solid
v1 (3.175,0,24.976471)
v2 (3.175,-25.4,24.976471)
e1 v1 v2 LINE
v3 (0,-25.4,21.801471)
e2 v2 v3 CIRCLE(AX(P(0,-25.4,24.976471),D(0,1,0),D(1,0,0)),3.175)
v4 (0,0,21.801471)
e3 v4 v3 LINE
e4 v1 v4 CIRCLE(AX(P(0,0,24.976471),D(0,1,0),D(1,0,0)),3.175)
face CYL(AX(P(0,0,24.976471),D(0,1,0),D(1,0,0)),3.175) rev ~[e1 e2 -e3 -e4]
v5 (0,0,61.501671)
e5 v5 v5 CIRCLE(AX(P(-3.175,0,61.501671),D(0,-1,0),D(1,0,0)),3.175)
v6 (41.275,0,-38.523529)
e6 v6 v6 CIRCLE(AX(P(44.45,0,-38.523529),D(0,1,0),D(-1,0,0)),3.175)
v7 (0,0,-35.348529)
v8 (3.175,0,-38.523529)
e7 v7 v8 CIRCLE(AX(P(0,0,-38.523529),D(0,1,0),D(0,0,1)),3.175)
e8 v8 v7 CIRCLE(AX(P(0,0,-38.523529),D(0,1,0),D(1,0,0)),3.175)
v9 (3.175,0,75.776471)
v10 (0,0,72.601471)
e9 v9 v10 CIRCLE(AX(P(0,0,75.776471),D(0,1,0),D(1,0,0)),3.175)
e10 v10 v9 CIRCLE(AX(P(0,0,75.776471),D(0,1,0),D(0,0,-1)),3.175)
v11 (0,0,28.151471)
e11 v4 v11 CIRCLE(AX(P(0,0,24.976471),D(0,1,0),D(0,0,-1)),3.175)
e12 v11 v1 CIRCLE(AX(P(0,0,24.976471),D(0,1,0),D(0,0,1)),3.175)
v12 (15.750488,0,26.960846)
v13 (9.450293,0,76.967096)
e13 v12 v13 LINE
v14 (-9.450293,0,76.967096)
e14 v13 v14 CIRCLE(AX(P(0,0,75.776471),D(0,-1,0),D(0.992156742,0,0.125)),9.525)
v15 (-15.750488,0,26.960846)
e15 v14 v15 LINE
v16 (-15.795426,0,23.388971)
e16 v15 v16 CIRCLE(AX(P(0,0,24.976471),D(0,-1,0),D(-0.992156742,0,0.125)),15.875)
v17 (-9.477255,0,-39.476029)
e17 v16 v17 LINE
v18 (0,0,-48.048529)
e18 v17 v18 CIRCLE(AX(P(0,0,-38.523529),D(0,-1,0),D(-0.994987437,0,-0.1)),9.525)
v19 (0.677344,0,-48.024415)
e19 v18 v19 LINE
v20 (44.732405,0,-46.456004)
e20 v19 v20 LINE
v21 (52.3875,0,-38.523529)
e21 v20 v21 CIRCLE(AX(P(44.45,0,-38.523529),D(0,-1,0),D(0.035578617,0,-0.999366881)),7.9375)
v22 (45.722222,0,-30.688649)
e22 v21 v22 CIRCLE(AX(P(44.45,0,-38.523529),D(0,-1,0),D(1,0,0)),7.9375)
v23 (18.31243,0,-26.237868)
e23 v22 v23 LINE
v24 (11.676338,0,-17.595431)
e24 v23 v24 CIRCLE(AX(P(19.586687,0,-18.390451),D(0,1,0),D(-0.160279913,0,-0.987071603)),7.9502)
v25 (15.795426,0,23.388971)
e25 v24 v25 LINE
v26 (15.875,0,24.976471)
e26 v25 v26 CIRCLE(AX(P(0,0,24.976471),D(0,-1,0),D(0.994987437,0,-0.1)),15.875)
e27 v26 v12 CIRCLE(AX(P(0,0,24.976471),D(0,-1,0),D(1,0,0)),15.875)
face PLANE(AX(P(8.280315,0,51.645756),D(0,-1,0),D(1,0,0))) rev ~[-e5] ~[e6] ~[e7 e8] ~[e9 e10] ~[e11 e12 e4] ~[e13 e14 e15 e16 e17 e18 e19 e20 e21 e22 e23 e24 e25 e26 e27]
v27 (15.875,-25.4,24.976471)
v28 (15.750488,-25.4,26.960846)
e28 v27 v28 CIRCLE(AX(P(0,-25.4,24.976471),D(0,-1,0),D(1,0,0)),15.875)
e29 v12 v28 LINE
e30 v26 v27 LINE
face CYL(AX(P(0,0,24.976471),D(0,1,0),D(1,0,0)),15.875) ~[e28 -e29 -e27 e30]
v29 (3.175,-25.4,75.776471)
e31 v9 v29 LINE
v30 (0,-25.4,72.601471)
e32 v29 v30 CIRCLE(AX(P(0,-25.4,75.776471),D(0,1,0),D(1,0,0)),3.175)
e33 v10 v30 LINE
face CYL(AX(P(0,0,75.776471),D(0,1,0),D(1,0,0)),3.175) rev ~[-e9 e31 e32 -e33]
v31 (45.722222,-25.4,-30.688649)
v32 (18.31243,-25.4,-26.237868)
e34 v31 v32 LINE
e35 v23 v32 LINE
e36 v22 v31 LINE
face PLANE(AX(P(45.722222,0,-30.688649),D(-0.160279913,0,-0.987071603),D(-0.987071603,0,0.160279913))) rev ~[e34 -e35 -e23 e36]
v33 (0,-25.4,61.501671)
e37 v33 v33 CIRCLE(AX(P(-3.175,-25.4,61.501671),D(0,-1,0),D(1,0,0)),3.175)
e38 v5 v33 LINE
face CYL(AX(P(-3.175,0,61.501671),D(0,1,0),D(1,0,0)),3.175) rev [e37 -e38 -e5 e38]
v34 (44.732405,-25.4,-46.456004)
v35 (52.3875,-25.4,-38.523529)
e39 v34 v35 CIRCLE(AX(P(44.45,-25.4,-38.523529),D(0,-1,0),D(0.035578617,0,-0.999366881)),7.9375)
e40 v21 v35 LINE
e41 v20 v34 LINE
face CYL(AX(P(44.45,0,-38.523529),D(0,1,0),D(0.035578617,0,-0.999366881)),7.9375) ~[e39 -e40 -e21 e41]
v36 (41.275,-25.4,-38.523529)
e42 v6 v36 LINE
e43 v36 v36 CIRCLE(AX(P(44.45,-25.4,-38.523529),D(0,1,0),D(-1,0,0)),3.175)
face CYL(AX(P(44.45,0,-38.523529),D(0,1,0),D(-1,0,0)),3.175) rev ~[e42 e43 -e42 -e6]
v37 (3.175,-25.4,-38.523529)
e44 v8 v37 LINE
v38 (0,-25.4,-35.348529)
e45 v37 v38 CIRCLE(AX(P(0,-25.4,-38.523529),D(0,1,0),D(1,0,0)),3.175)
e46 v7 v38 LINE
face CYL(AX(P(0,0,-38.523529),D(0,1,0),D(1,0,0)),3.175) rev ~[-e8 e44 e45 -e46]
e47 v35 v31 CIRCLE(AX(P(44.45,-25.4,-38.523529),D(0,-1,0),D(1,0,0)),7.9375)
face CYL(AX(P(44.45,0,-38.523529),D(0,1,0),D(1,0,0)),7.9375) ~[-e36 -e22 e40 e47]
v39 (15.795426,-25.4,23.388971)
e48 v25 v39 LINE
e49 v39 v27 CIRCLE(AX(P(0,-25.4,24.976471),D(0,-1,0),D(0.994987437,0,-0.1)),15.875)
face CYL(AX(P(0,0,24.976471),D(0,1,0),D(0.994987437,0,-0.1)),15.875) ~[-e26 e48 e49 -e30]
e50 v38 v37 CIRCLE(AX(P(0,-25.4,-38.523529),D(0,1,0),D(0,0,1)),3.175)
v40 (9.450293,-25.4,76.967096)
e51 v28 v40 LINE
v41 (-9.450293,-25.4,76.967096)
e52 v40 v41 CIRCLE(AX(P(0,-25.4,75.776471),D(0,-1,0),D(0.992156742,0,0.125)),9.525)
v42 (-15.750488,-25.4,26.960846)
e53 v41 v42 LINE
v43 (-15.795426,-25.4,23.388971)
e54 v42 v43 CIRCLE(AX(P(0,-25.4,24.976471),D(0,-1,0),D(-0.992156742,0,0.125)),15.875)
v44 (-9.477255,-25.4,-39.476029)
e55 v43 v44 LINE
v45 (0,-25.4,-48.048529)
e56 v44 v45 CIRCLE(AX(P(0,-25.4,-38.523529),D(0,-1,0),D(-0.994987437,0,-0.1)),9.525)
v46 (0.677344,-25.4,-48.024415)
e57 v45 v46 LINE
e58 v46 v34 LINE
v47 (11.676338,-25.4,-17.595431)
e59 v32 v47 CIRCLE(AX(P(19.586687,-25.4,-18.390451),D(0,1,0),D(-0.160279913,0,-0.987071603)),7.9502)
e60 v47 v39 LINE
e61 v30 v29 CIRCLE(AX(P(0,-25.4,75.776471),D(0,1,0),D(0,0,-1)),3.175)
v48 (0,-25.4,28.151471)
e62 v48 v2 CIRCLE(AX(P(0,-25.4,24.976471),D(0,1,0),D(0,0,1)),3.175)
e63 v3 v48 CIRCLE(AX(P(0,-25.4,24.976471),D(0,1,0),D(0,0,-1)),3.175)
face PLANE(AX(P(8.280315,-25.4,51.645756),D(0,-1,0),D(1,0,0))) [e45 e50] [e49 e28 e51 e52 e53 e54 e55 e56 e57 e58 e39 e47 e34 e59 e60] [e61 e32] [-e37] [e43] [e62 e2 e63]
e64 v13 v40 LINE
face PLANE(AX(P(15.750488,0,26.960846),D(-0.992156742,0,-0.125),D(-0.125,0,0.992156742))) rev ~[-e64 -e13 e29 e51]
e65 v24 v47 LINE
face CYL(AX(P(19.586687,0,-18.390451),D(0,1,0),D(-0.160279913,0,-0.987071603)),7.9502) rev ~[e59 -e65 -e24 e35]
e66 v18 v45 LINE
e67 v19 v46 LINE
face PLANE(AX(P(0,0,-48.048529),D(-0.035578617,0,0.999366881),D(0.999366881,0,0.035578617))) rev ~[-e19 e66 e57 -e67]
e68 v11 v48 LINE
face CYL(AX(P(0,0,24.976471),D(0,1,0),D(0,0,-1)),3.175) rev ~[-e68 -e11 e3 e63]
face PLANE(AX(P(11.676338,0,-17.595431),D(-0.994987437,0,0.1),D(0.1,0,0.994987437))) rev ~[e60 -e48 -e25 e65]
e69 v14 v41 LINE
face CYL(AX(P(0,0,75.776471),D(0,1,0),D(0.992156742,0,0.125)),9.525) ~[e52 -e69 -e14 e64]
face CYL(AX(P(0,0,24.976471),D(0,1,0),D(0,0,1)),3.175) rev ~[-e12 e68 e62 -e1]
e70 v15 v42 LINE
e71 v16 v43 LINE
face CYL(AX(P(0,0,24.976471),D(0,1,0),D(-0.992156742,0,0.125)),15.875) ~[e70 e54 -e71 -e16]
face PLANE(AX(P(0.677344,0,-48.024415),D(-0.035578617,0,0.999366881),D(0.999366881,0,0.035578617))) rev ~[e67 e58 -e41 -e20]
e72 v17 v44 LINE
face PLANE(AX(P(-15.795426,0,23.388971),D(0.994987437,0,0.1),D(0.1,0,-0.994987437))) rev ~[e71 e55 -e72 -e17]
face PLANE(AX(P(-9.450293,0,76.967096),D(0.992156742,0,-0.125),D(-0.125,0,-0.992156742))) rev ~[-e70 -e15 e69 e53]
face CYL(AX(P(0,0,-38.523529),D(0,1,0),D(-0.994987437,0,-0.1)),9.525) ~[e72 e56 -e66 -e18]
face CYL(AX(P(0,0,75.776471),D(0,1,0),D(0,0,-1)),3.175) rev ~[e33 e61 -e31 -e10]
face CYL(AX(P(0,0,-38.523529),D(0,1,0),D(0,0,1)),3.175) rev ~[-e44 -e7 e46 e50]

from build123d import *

# Parameters (mm, degrees)
F0_R     = 3.175
F1_DEPTH = 25.4


# Not quite as in the source:
# - a feature of the source that left no trace in its solid (it failed there, or was rolled back) is left out


with BuildPart() as f1:
    # F0 (on Front) → F1 (new body)
    with BuildSketch(Plane.XZ):
        with BuildLine():
            ThreePointArc((9.525, 75.7764706288), (6.7351920908, 69.041278538), (0, 66.2514706288))
            Line((0, 66.2514706288), (0, 61.5016706288))
            Line((0, 61.5016706288), (0, 40.8514706288))
            ThreePointArc((0, 40.8514706288), (10.5003255158, 36.8827206288), (15.7504882737, 26.9608456288))
            Line((15.7504882737, 26.9608456288), (9.4502929642, 76.9670956288))
            ThreePointArc((9.4502929642, 76.9670956288), (9.5063048942, 76.3729538708), (9.525, 75.7764706288))
        make_face()
        with BuildLine():
            ThreePointArc((-9.4502929642, 76.9670956288), (-7.14375, 69.4762753193), (0, 66.2514706288))
            ThreePointArc((0, 66.2514706288), (6.7351920908, 69.041278538), (9.525, 75.7764706288))
            ThreePointArc((9.525, 75.7764706288), (9.5063048942, 76.3729538708), (9.4502929642, 76.9670956288))
            ThreePointArc((9.4502929642, 76.9670956288), (0, 85.3014706288), (-9.4502929642, 76.9670956288))
        make_face()
        with BuildLine():
            ThreePointArc((3.175, 75.7764706288), (2.2450640303, 73.5314065985), (0, 72.6014706288))
            ThreePointArc((0, 72.6014706288), (-2.2450640303, 78.0215346591), (3.175, 75.7764706288))
        make_face(mode=Mode.SUBTRACT)
        with BuildLine():
            Line((0, 61.5016706288), (0, 66.2514706288))
            ThreePointArc((0, 66.2514706288), (-7.14375, 69.4762753193), (-9.4502929642, 76.9670956288))
            Line((-9.4502929642, 76.9670956288), (-15.7504882737, 26.9608456288))
            ThreePointArc((-15.7504882737, 26.9608456288), (-10.5003255158, 36.8827206288), (0, 40.8514706288))
            Line((0, 40.8514706288), (0, 61.5016706288))
        make_face()
        with Locations((-3.175, 61.5016706288)):
            Circle(F0_R, mode=Mode.SUBTRACT)
        with BuildLine():
            Line((0, 28.1514706288), (0, 40.8514706288))
            ThreePointArc((0, 40.8514706288), (-10.5003255158, 36.8827206288), (-15.7504882737, 26.9608456288))
            ThreePointArc((-15.7504882737, 26.9608456288), (-15.8737438155, 25.1761761155), (-15.7954255641, 23.3889706288))
            ThreePointArc((-15.7954255641, 23.3889706288), (-10.6492737428, 13.2032555305), (0, 9.1014706288))
            Line((0, 9.1014706288), (0, 21.8014706288))
            ThreePointArc((0, 21.8014706288), (-3.175, 24.9764706288), (0, 28.1514706288))
        make_face()
        with BuildLine():
            ThreePointArc((15.7504882737, 26.9608456288), (10.5003255158, 36.8827206288), (0, 40.8514706288))
            Line((0, 40.8514706288), (0, 28.1514706288))
            ThreePointArc((0, 28.1514706288), (2.2450640303, 27.2215346591), (3.175, 24.9764706288))
            ThreePointArc((3.175, 24.9764706288), (2.2450640303, 22.7314065985), (0, 21.8014706288))
            Line((0, 21.8014706288), (0, 9.1014706288))
            ThreePointArc((0, 9.1014706288), (10.6492737428, 13.2032555305), (15.7954255641, 23.3889706288))
            ThreePointArc((15.7954255641, 23.3889706288), (15.8550939106, 24.1817240747), (15.875, 24.9764706288))
            ThreePointArc((15.875, 24.9764706288), (15.8438414904, 25.9706093654), (15.7504882737, 26.9608456288))
        make_face()
        with BuildLine():
            ThreePointArc((0, 9.1014706288), (-10.6492737428, 13.2032555305), (-15.7954255641, 23.3889706288))
            Line((-15.7954255641, 23.3889706288), (-9.4772553384, -39.4760293712))
            ThreePointArc((-9.4772553384, -39.4760293712), (-7.063929059, -32.1339651255), (0, -28.9985293712))
            Line((0, -28.9985293712), (0, 9.1014706288))
        make_face()
        with BuildLine():
            ThreePointArc((15.7954255641, 23.3889706288), (10.6492737428, 13.2032555305), (0, 9.1014706288))
            Line((0, 9.1014706288), (0, -28.9985293712))
            ThreePointArc((0, -28.9985293712), (6.7351920908, -31.7883372804), (9.525, -38.5235293712))
            Line((9.525, -38.5235293712), (36.5125, -38.5235293712))
            ThreePointArc((36.5125, -38.5235293712), (39.3067692229, -32.4777801684), (45.7222218075, -30.6886485219))
            Line((45.7222218075, -30.6886485219), (18.312429941, -26.2378680158))
            ThreePointArc((18.312429941, -26.2378680158), (13.2809615783, -23.2323004998), (11.6763381809, -17.5954313572))
            Line((11.6763381809, -17.5954313572), (15.7954255641, 23.3889706288))
        make_face()
        with BuildLine():
            Line((36.5125, -38.5235293712), (9.525, -38.5235293712))
            ThreePointArc((9.525, -38.5235293712), (6.9705567315, -45.0148284595), (0.6773435479, -48.0244151572))
            Line((0.6773435479, -48.0244151572), (44.7324052746, -46.4560039858))
            ThreePointArc((44.7324052746, -46.4560039858), (38.9380895153, -44.2351621551), (36.5125, -38.5235293712))
        make_face()
        with BuildLine():
            ThreePointArc((0, -28.9985293712), (-7.063929059, -32.1339651255), (-9.4772553384, -39.4760293712))
            ThreePointArc((-9.4772553384, -39.4760293712), (-6.3895642457, -45.5874584302), (0, -48.0485293712))
            Line((0, -48.0485293712), (0.6773435479, -48.0244151572))
            ThreePointArc((0.6773435479, -48.0244151572), (6.9705567315, -45.0148284595), (9.525, -38.5235293712))
            Line((9.525, -38.5235293712), (3.175, -38.5235293712))
            ThreePointArc((3.175, -38.5235293712), (-2.2450640303, -40.7685934015), (0, -35.3485293712))
            Line((0, -35.3485293712), (0, -28.9985293712))
        make_face()
        with BuildLine():
            ThreePointArc((9.525, -38.5235293712), (6.7351920908, -31.7883372804), (0, -28.9985293712))
            Line((0, -28.9985293712), (0, -35.3485293712))
            ThreePointArc((0, -35.3485293712), (2.2450640303, -36.2784653409), (3.175, -38.5235293712))
            Line((3.175, -38.5235293712), (9.525, -38.5235293712))
        make_face()
        with BuildLine():
            ThreePointArc((45.7222218075, -30.6886485219), (39.3067692229, -32.4777801684), (36.5125, -38.5235293712))
            ThreePointArc((36.5125, -38.5235293712), (38.9380895153, -44.2351621551), (44.7324052746, -46.4560039858))
            ThreePointArc((44.7324052746, -46.4560039858), (50.1616327839, -44.0354398559), (52.3875, -38.5235293712))
            ThreePointArc((52.3875, -38.5235293712), (50.4957492028, -33.3802985941), (45.7222218075, -30.6886485219))
        make_face()
        with BuildLine():
            ThreePointArc((47.625, -38.5235293712), (44.45, -41.6985293712), (41.275, -38.5235293712))
            ThreePointArc((41.275, -38.5235293712), (44.45, -35.3485293712), (47.625, -38.5235293712))
        make_face(mode=Mode.SUBTRACT)
    extrude(amount=F1_DEPTH)


solid = f1.part
